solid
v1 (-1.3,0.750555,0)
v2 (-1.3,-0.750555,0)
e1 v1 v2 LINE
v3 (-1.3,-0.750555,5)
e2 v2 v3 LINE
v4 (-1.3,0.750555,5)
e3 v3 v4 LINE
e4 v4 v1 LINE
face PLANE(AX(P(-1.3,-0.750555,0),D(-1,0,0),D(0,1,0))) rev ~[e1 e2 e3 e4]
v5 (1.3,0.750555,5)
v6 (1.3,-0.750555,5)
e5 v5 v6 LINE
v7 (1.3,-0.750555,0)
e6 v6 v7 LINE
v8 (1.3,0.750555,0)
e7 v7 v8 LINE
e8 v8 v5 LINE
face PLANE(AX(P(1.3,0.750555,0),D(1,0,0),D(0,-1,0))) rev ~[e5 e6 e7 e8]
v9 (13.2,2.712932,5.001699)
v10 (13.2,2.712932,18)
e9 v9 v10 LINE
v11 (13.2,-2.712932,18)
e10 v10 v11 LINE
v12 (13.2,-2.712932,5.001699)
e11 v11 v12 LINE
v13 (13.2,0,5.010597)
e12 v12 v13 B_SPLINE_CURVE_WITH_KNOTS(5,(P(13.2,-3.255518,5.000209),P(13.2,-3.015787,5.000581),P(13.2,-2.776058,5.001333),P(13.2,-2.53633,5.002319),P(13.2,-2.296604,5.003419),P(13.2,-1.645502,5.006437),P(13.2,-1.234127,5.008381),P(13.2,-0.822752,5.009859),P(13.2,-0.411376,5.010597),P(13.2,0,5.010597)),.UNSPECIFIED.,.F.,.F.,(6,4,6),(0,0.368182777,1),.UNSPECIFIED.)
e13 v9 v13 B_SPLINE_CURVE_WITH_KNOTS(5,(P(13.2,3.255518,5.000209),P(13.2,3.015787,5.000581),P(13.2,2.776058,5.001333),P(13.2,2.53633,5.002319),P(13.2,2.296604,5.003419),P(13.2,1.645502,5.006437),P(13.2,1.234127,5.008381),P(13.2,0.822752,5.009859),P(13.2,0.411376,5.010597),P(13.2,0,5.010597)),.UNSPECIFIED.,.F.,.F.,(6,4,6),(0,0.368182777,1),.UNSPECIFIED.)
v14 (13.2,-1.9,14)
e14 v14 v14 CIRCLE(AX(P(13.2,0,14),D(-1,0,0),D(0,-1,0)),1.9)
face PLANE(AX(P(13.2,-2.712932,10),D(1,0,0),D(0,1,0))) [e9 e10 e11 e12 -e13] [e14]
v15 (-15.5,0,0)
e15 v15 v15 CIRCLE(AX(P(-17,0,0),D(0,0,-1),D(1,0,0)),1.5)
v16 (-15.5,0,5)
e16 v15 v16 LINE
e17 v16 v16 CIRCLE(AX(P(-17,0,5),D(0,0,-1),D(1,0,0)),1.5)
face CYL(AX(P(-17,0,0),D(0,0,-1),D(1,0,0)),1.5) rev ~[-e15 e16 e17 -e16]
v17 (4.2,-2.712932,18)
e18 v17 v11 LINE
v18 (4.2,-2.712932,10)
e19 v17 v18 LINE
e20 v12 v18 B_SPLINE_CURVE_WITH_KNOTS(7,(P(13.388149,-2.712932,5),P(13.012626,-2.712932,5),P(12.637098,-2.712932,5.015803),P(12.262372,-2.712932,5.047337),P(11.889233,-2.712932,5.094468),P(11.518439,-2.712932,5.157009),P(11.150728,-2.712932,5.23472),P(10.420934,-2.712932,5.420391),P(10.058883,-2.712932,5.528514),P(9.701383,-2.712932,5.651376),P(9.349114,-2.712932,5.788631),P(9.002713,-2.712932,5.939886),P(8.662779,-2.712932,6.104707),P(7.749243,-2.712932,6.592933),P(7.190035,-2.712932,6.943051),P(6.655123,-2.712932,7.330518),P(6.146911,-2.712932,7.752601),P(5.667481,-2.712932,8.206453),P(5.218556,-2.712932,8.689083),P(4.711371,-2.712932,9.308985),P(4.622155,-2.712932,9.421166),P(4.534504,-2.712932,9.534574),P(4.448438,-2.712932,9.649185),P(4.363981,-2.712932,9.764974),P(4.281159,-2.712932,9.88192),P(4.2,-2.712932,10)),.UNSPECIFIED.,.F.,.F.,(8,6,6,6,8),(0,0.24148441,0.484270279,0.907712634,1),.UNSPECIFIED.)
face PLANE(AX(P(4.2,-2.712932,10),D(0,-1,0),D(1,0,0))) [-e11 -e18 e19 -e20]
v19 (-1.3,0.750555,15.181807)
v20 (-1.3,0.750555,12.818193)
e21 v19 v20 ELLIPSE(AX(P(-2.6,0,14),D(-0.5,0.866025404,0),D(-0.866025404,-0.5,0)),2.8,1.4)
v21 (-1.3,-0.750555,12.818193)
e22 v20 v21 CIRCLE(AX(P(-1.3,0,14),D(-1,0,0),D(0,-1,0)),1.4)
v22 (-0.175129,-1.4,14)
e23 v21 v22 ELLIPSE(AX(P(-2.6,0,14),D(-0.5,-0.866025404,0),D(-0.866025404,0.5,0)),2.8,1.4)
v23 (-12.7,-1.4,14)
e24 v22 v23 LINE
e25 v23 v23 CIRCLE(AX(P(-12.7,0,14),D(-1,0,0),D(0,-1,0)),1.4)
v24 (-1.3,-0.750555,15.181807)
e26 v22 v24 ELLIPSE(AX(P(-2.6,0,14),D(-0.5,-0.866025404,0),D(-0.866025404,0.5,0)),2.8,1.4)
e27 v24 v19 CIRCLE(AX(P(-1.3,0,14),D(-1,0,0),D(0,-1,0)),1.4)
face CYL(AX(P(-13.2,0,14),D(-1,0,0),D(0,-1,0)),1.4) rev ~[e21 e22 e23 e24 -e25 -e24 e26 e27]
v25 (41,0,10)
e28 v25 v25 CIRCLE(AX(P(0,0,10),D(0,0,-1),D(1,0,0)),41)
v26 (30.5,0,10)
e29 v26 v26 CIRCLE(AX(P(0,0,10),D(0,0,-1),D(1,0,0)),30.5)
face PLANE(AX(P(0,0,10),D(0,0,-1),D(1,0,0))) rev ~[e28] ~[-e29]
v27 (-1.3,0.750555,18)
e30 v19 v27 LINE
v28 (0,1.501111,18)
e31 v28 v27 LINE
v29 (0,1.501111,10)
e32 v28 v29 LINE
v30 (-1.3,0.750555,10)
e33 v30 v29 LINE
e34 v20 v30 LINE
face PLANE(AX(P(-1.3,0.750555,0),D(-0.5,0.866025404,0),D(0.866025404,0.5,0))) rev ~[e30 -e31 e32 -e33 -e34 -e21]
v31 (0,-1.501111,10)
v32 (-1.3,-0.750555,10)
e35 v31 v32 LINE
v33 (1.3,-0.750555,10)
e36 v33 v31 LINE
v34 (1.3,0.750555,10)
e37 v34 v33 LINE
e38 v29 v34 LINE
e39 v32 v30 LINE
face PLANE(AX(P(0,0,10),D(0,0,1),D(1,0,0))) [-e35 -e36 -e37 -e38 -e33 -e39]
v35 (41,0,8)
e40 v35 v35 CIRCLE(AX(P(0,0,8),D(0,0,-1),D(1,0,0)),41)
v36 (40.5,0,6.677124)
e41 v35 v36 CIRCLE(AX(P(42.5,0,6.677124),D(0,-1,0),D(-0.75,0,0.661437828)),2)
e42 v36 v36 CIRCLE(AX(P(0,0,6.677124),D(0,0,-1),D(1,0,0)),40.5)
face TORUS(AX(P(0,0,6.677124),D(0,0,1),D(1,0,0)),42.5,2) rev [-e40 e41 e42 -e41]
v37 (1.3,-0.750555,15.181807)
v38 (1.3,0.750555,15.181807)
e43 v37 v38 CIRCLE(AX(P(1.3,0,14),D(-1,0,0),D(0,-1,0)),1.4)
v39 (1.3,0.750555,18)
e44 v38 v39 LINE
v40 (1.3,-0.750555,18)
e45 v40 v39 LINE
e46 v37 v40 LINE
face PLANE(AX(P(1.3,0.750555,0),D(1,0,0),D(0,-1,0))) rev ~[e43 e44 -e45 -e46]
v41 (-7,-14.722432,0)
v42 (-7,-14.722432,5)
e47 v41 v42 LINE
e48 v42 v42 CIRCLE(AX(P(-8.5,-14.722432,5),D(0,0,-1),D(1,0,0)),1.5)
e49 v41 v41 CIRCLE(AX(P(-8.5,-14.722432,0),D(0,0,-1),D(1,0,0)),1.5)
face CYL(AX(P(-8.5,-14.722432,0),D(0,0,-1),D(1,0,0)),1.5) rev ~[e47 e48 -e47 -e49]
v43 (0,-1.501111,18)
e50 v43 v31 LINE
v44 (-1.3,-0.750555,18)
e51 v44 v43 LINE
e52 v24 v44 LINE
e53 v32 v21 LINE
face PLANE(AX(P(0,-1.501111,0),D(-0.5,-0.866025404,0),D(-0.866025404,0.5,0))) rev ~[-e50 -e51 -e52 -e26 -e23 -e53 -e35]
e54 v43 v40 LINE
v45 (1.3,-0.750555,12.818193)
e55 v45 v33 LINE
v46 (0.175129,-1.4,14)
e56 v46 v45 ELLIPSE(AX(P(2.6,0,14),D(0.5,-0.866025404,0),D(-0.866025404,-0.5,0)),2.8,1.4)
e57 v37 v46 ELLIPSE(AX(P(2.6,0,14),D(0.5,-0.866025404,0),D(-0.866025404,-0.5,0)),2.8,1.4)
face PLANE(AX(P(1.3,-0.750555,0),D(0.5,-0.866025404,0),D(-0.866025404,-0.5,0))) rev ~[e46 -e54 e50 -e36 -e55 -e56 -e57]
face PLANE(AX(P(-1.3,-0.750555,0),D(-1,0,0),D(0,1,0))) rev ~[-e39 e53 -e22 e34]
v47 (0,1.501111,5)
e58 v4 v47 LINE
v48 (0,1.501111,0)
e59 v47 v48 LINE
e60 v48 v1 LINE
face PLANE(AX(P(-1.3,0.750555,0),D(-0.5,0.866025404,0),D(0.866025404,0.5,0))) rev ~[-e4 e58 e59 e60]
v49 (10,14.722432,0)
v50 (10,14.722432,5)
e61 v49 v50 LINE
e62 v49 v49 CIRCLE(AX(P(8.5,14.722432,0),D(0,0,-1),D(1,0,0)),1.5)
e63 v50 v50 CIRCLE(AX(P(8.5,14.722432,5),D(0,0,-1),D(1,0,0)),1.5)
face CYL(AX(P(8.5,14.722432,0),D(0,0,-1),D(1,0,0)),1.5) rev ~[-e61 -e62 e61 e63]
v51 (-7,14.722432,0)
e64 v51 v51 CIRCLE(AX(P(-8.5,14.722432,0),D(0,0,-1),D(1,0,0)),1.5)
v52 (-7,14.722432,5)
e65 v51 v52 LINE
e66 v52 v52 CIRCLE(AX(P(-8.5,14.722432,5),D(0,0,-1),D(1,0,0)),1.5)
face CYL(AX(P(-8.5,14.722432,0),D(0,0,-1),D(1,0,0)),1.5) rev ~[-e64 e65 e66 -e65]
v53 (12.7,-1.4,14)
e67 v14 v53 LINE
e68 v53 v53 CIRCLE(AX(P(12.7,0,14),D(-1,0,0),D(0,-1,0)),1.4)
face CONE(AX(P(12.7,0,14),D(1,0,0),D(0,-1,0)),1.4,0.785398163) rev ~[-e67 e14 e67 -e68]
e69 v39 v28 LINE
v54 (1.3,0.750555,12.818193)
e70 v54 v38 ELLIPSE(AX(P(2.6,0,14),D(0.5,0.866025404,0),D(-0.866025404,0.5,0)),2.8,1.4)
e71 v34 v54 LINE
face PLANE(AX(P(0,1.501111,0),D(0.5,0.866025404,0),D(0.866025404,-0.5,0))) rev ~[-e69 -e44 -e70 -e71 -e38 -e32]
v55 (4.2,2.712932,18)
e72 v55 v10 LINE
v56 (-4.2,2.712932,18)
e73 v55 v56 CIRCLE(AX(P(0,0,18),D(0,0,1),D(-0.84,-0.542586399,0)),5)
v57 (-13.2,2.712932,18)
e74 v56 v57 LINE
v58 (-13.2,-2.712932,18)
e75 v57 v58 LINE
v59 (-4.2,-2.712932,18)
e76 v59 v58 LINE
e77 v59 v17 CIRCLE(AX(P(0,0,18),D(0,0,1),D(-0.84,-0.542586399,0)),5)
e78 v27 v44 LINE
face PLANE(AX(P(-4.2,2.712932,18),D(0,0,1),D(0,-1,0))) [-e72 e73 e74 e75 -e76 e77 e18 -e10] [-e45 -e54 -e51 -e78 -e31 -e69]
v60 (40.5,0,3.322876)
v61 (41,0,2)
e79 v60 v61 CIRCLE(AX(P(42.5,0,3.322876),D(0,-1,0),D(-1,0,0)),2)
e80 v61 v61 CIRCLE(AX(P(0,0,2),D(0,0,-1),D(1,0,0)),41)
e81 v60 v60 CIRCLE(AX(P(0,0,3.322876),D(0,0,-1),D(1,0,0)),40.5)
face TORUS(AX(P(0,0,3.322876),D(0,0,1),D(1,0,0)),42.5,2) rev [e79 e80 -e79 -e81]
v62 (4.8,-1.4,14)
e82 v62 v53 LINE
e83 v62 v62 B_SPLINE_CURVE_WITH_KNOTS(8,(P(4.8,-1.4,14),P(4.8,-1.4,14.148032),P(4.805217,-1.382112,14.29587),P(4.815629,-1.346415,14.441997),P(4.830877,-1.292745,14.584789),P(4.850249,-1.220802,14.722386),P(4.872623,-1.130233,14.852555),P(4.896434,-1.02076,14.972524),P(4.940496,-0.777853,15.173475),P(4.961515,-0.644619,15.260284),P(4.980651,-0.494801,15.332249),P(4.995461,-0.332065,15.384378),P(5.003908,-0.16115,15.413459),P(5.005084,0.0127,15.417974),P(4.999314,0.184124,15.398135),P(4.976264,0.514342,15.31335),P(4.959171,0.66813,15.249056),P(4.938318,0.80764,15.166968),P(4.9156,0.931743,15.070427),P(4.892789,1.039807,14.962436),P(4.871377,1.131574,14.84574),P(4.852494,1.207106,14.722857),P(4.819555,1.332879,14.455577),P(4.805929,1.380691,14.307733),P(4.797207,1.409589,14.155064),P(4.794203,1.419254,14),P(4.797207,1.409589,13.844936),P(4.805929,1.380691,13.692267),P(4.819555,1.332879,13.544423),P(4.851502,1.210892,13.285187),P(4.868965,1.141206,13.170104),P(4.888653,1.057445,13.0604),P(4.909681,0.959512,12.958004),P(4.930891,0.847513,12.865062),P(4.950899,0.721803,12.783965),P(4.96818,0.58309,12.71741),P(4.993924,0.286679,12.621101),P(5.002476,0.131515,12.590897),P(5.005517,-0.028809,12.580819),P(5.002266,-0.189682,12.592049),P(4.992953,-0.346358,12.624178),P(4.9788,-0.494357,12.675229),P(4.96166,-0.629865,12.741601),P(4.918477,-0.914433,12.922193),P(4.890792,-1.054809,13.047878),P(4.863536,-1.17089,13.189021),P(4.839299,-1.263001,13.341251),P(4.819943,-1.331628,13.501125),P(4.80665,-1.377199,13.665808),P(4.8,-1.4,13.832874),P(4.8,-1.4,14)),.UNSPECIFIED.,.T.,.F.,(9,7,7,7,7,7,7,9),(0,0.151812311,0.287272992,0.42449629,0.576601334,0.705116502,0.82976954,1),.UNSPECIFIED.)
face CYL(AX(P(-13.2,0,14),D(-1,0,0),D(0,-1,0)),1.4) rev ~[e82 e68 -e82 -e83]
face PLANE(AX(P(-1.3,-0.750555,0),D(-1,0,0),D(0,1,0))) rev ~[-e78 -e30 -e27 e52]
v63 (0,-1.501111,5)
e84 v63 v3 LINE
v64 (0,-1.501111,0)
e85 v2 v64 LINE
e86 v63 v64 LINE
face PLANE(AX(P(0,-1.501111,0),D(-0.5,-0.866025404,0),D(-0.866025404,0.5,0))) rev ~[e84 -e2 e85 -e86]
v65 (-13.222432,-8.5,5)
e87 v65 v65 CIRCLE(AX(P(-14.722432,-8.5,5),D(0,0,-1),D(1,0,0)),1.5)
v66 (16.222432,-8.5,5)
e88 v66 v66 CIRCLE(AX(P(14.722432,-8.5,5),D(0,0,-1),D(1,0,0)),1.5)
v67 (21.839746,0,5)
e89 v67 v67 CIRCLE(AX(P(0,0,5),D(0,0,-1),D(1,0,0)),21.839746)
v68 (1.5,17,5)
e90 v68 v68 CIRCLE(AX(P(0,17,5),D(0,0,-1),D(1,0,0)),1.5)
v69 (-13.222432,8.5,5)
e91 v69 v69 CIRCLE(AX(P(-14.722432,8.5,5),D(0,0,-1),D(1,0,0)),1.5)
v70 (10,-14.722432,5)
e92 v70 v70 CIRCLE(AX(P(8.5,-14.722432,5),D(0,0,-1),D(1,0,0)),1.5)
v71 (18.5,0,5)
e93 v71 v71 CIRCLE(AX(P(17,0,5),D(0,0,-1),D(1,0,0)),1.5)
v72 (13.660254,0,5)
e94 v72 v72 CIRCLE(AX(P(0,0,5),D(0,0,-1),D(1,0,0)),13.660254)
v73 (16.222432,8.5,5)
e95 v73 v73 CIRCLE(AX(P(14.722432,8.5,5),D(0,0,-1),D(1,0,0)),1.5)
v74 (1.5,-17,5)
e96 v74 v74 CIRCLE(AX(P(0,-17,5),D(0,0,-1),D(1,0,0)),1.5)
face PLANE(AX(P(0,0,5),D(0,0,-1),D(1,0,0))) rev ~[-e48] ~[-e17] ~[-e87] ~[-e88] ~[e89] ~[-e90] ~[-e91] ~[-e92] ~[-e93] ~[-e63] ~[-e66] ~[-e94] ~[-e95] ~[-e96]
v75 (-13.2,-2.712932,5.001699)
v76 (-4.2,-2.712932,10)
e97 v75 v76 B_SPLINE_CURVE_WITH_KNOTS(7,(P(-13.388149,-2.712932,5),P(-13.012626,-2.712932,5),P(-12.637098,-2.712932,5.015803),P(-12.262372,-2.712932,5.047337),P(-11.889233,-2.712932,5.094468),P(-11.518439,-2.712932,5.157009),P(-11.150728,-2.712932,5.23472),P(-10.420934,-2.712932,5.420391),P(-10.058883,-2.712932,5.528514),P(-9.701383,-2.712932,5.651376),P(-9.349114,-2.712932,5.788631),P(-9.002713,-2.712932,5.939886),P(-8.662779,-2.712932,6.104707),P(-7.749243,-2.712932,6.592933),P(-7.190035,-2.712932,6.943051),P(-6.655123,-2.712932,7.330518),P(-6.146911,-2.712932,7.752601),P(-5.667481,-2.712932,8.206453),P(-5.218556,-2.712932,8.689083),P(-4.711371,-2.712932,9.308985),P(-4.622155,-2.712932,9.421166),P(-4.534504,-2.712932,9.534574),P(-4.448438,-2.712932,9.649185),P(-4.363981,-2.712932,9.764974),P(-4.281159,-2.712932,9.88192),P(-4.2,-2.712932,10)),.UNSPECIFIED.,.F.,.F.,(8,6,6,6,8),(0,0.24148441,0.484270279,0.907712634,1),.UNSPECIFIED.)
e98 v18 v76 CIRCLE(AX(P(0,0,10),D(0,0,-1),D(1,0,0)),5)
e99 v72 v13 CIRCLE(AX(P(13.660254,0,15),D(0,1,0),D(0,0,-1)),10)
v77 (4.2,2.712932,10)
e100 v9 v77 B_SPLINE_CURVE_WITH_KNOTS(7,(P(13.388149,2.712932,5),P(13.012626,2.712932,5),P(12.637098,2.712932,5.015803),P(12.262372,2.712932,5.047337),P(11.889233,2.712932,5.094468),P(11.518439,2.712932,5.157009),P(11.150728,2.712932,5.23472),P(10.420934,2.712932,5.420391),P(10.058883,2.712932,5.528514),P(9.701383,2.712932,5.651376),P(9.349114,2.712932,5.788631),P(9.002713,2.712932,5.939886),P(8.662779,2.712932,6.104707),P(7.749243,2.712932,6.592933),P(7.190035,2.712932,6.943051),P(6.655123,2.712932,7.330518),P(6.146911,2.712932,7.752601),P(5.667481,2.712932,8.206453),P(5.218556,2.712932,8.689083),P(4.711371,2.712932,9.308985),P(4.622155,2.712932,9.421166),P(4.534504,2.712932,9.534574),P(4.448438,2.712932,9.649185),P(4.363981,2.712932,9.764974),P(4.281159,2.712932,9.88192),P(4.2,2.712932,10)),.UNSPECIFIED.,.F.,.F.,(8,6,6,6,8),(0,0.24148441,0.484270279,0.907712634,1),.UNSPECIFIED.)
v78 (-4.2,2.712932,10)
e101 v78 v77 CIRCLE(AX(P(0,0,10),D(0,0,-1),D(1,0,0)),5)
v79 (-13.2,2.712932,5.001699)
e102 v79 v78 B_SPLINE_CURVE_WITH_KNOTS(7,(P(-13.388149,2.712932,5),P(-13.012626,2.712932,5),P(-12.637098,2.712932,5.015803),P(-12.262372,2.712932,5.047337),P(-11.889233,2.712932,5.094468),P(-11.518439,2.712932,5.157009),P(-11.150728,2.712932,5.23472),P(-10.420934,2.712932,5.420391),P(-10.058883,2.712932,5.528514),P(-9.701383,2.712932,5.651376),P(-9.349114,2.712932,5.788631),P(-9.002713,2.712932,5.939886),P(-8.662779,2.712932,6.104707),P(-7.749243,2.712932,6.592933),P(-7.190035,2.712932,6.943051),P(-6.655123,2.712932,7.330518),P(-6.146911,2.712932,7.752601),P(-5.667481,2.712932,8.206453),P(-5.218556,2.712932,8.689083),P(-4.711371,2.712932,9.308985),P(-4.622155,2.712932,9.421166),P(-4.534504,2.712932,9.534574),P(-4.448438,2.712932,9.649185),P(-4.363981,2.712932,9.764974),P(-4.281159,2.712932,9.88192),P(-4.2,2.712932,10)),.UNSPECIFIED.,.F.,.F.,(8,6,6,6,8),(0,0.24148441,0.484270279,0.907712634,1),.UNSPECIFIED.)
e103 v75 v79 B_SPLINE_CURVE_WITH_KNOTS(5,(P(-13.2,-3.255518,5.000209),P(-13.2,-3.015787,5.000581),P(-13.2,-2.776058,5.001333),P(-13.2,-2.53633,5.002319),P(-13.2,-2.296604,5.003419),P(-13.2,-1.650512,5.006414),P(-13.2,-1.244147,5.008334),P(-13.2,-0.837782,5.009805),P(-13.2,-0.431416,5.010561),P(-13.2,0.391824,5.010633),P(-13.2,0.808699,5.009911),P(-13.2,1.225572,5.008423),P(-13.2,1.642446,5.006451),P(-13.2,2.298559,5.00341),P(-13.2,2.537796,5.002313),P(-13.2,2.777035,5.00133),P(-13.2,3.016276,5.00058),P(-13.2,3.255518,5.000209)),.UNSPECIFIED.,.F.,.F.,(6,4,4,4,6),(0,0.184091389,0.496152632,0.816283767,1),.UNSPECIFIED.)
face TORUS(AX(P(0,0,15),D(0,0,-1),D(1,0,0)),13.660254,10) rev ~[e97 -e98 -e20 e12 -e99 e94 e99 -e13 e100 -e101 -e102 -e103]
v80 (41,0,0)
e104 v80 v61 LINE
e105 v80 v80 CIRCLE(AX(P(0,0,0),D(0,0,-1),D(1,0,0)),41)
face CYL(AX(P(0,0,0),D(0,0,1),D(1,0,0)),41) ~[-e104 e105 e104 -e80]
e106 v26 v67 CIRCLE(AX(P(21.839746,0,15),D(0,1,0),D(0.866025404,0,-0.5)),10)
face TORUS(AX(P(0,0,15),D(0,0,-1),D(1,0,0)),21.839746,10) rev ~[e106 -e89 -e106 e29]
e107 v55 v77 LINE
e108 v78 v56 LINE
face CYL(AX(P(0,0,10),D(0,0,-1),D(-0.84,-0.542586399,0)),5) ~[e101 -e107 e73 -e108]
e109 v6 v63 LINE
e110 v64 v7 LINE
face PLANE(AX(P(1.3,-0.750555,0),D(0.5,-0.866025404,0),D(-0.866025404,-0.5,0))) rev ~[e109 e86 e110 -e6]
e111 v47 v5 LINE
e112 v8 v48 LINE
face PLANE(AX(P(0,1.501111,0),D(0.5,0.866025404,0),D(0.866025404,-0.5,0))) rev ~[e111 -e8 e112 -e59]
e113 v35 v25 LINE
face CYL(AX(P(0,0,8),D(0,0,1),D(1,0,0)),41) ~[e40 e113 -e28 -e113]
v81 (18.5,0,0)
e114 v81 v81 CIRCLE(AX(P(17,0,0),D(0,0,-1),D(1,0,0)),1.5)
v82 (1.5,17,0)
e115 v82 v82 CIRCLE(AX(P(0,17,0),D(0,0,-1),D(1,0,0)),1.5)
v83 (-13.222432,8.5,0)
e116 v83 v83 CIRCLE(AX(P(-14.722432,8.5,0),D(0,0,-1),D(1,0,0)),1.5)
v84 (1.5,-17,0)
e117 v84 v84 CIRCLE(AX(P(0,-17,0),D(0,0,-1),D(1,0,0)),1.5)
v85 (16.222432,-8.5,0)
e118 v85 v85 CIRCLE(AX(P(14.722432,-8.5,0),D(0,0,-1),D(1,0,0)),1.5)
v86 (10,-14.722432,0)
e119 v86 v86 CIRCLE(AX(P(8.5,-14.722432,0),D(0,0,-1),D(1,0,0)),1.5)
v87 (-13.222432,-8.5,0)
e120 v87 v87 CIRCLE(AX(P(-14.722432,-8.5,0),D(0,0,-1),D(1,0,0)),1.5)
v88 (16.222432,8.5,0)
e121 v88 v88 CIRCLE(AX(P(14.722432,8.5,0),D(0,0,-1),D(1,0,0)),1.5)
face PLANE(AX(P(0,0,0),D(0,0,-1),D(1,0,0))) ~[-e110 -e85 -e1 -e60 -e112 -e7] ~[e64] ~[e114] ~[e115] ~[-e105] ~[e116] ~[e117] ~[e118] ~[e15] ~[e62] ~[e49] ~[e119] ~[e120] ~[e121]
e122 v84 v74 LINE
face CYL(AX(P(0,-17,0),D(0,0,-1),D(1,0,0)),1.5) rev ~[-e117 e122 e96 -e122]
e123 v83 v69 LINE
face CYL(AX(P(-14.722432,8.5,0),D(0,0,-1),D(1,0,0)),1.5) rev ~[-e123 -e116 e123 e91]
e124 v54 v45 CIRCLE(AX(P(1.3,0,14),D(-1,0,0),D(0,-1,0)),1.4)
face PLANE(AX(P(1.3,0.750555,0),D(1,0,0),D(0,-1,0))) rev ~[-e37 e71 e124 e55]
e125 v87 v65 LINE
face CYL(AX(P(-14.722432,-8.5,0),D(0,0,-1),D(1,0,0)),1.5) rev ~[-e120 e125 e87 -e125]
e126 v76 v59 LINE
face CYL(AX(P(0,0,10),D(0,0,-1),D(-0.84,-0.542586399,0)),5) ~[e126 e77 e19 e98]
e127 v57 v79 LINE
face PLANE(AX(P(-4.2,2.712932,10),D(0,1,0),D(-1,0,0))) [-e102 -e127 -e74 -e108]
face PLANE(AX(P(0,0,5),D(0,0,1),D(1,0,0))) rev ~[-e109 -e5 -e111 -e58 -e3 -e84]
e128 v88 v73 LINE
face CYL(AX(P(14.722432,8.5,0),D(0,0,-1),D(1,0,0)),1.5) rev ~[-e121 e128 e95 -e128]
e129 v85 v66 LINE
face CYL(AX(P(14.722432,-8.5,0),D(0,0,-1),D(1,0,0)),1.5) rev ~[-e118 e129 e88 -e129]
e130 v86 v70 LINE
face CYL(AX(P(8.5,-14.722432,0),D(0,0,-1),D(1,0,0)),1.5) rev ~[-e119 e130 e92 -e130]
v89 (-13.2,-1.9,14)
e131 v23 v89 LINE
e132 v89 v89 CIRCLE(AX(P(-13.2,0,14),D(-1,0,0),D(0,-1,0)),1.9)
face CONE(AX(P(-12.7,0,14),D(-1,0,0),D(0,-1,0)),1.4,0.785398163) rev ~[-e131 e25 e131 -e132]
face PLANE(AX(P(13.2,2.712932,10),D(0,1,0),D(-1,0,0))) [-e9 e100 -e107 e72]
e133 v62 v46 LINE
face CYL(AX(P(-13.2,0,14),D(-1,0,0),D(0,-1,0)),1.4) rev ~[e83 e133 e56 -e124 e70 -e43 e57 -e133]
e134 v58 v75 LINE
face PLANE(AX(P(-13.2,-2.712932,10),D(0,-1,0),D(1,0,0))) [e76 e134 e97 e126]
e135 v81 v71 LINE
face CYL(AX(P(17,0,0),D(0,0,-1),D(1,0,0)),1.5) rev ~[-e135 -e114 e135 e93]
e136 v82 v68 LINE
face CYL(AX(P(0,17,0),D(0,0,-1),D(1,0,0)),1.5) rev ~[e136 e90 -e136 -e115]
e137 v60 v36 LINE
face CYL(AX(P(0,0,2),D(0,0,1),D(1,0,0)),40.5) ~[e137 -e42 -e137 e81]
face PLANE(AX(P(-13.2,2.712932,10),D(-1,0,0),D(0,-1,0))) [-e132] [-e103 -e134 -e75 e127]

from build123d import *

# Parameters (mm, degrees)
F5_DEPTH  = 8
F6_DEPTH  = 9
F7_R      = 1.4
F8_DEPTH  = 54.201
F10_DEPTH = 18.001
F12_DEPTH = 26.4
F14_DEPTH = 18.001
F16_DEPTH = 5
F17_SIZE  = 0.5
F18_R     = 1.5
F19_DEPTH = 18.0010001


# Not quite as in the source:
# - a fillet or chamfer that OpenCascade refuses, or shapes differently, is made with other operations: its cross-section is extruded or revolved along the edge and cut away or added


with BuildPart() as f1:
    # F0 (on Front) → F1 (revolve)
    with BuildSketch(Plane.XZ):
        Polygon((0, 10), (0, 0), (41, 0), (41, 2), (40.5, 2), (40.5, 8), (41, 8), (41, 10), (30.5, 10), (30.5, 5), (5, 5), (5, 10), align=None)
    revolve(axis=Axis((0, 0, 5), (0, 0, -1)))

    # F2: fillet of radius 10 on 1 edges, made by hand

    # F2_s1 → F2_t2 (revolve)
    with BuildSketch(Plane.XZ):
        with BuildLine():
            ThreePointArc((13.6602540378, 5), (8.6602540378, 6.3397459622), (5, 10))
            Line((5, 10), (5, 5))
            Line((5, 5), (13.6602540378, 5))
        make_face()
    revolve(axis=Axis((0, 0, 5), (0, 0, -1)))

    # F3: fillet of radius 10 on 1 edges, made by hand

    # F3_s1 → F3_t2 (revolve)
    with BuildSketch(Plane.XZ):
        with BuildLine():
            ThreePointArc((30.5, 10), (26.8397459622, 6.3397459622), (21.8397459622, 5))
            Line((21.8397459622, 5), (30.5, 5))
            Line((30.5, 5), (30.5, 10))
        make_face()
    revolve(axis=Axis((0, 0, 5), (0, 0, -1)))

    # F4 (on face) → F5 (join)
    with BuildSketch(Plane.XY.offset(10)):
        with BuildLine():
            Line((-4.2, 2.7129319933), (-4.2, -2.7129319933))
            ThreePointArc((-4.2, -2.7129319933), (5, 0), (-4.2, 2.7129319933))
        make_face()
        Polygon((1.3, -0.7505553499), (0, -1.5011106999), (-1.3, -0.7505553499), (-1.3, 0.7505553499), (0, 1.5011106999), (1.3, 0.7505553499), align=None, mode=Mode.SUBTRACT)
    extrude(amount=F5_DEPTH)

    # F6 (add): a face of the model
    f6_faces = [f1.faces().sort_by_distance(p)[0] for p in [
        (-4.2, 0, 14),
    ]]
    extrude(f6_faces, amount=F6_DEPTH)

    # F7 (on face) → F8 (cut, through all)
    with BuildSketch(Plane(origin=(-13.2, 0, 0), x_dir=(0, -1, 0), z_dir=(-1, 0, 0))):
        with Locations((0, 14)):
            Circle(F7_R)
    extrude(amount=-F8_DEPTH, mode=Mode.SUBTRACT)

    # F9 (on face) → F10 (cut, through all)
    with BuildSketch(Plane.XY.offset(18)):
        Polygon((0, -1.5011106999), (1.3, -0.7505553499), (1.3, 0.7505553499), (0, 1.5011106999), (-1.3, 0.7505553499), (-1.3, -0.7505553499), align=None)
    extrude(amount=-F10_DEPTH, mode=Mode.SUBTRACT)

    # F11: fillet of radius 2 on 2 edges, made by hand

    # F11_s1 → F11_t2 (revolve)
    with BuildSketch(Plane.XZ):
        with BuildLine():
            ThreePointArc((40.5, 3.3228756555), (40.6291713066, 2.6157688743), (41, 2))
            Line((41, 2), (40.5, 2))
            Line((40.5, 2), (40.5, 3.3228756555))
        make_face()
    revolve(axis=Axis((0, 0, 2), (0, 0, -1)))

    # F11_s3 → F11_t4 (revolve)
    with BuildSketch(Plane.XZ):
        with BuildLine():
            ThreePointArc((41, 8), (40.6291713066, 7.3842311257), (40.5, 6.6771243445))
            Line((40.5, 6.6771243445), (40.5, 8))
            Line((40.5, 8), (41, 8))
        make_face()
    revolve(axis=Axis((0, 0, 8), (0, 0, -1)))

    # F12 (add): a face of the model
    f12_faces = [f1.faces().sort_by_distance(p)[0] for p in [
        (-13.2, 2.6162676255, 14),
    ]]
    extrude(f12_faces, amount=-F12_DEPTH)

    # F13 (on face) → F14 (cut, through all)
    with BuildSketch(Plane(origin=(0, 0, 0), x_dir=(1, 0, 0), z_dir=(0, 0, -1))):
        Polygon((0, -1.5011106999), (1.3, -0.7505553499), (1.3, 0.7505553499), (0, 1.5011106999), (-1.3, 0.7505553499), (-1.3, -0.7505553499), align=None)
    extrude(amount=-F14_DEPTH, mode=Mode.SUBTRACT)

    # F15 (on face) → F16 (join, through all)
    with BuildSketch(Plane.XY.offset(10)):
        with BuildLine():
            Line((13.2, -2.7129319933), (13.2, 2.7129319933))
            Line((13.2, 2.7129319933), (4.2, 2.7129319933))
            ThreePointArc((4.2, 2.7129319933), (0, 5), (-4.2, 2.7129319933))
            Line((-4.2, 2.7129319933), (-13.2, 2.7129319933))
            Line((-13.2, 2.7129319933), (-13.2, -2.7129319933))
            Line((-13.2, -2.7129319933), (-4.2, -2.7129319933))
            ThreePointArc((-4.2, -2.7129319933), (0, -5), (4.2, -2.7129319933))
            Line((4.2, -2.7129319933), (13.2, -2.7129319933))
        make_face()
    extrude(amount=-F16_DEPTH)

    # F17
    f17_edges = [f1.edges().sort_by_distance(p)[0] for p in [
        (-13.2, 1.4, 14),
        (13.2, 1.4, 14),
    ]]
    chamfer(f17_edges, length=F17_SIZE)

    # F18 (on face) → F19 (cut, through all)
    with BuildSketch(Plane(origin=(0, 0, 0), x_dir=(1, 0, 0), z_dir=(0, 0, -1))):
        with Locations((0, 17)):
            Circle(F18_R)
        with Locations((-8.5, 14.7224318643)):
            Circle(F18_R)
        with Locations((-14.7224318643, 8.5)):
            Circle(F18_R)
        with Locations((-17, 0)):
            Circle(F18_R)
        with Locations((-14.7224318643, -8.5)):
            Circle(F18_R)
        with Locations((-8.5, -14.7224318643)):
            Circle(F18_R)
        with Locations((0, -17)):
            Circle(F18_R)
        with Locations((8.5, -14.7224318643)):
            Circle(F18_R)
        with Locations((14.7224318643, -8.5)):
            Circle(F18_R)
        with Locations((17, 0)):
            Circle(F18_R)
        with Locations((14.7224318643, 8.5)):
            Circle(F18_R)
        with Locations((8.5, 14.7224318643)):
            Circle(F18_R)
    extrude(amount=-F19_DEPTH, mode=Mode.SUBTRACT)


solid = f1.part
